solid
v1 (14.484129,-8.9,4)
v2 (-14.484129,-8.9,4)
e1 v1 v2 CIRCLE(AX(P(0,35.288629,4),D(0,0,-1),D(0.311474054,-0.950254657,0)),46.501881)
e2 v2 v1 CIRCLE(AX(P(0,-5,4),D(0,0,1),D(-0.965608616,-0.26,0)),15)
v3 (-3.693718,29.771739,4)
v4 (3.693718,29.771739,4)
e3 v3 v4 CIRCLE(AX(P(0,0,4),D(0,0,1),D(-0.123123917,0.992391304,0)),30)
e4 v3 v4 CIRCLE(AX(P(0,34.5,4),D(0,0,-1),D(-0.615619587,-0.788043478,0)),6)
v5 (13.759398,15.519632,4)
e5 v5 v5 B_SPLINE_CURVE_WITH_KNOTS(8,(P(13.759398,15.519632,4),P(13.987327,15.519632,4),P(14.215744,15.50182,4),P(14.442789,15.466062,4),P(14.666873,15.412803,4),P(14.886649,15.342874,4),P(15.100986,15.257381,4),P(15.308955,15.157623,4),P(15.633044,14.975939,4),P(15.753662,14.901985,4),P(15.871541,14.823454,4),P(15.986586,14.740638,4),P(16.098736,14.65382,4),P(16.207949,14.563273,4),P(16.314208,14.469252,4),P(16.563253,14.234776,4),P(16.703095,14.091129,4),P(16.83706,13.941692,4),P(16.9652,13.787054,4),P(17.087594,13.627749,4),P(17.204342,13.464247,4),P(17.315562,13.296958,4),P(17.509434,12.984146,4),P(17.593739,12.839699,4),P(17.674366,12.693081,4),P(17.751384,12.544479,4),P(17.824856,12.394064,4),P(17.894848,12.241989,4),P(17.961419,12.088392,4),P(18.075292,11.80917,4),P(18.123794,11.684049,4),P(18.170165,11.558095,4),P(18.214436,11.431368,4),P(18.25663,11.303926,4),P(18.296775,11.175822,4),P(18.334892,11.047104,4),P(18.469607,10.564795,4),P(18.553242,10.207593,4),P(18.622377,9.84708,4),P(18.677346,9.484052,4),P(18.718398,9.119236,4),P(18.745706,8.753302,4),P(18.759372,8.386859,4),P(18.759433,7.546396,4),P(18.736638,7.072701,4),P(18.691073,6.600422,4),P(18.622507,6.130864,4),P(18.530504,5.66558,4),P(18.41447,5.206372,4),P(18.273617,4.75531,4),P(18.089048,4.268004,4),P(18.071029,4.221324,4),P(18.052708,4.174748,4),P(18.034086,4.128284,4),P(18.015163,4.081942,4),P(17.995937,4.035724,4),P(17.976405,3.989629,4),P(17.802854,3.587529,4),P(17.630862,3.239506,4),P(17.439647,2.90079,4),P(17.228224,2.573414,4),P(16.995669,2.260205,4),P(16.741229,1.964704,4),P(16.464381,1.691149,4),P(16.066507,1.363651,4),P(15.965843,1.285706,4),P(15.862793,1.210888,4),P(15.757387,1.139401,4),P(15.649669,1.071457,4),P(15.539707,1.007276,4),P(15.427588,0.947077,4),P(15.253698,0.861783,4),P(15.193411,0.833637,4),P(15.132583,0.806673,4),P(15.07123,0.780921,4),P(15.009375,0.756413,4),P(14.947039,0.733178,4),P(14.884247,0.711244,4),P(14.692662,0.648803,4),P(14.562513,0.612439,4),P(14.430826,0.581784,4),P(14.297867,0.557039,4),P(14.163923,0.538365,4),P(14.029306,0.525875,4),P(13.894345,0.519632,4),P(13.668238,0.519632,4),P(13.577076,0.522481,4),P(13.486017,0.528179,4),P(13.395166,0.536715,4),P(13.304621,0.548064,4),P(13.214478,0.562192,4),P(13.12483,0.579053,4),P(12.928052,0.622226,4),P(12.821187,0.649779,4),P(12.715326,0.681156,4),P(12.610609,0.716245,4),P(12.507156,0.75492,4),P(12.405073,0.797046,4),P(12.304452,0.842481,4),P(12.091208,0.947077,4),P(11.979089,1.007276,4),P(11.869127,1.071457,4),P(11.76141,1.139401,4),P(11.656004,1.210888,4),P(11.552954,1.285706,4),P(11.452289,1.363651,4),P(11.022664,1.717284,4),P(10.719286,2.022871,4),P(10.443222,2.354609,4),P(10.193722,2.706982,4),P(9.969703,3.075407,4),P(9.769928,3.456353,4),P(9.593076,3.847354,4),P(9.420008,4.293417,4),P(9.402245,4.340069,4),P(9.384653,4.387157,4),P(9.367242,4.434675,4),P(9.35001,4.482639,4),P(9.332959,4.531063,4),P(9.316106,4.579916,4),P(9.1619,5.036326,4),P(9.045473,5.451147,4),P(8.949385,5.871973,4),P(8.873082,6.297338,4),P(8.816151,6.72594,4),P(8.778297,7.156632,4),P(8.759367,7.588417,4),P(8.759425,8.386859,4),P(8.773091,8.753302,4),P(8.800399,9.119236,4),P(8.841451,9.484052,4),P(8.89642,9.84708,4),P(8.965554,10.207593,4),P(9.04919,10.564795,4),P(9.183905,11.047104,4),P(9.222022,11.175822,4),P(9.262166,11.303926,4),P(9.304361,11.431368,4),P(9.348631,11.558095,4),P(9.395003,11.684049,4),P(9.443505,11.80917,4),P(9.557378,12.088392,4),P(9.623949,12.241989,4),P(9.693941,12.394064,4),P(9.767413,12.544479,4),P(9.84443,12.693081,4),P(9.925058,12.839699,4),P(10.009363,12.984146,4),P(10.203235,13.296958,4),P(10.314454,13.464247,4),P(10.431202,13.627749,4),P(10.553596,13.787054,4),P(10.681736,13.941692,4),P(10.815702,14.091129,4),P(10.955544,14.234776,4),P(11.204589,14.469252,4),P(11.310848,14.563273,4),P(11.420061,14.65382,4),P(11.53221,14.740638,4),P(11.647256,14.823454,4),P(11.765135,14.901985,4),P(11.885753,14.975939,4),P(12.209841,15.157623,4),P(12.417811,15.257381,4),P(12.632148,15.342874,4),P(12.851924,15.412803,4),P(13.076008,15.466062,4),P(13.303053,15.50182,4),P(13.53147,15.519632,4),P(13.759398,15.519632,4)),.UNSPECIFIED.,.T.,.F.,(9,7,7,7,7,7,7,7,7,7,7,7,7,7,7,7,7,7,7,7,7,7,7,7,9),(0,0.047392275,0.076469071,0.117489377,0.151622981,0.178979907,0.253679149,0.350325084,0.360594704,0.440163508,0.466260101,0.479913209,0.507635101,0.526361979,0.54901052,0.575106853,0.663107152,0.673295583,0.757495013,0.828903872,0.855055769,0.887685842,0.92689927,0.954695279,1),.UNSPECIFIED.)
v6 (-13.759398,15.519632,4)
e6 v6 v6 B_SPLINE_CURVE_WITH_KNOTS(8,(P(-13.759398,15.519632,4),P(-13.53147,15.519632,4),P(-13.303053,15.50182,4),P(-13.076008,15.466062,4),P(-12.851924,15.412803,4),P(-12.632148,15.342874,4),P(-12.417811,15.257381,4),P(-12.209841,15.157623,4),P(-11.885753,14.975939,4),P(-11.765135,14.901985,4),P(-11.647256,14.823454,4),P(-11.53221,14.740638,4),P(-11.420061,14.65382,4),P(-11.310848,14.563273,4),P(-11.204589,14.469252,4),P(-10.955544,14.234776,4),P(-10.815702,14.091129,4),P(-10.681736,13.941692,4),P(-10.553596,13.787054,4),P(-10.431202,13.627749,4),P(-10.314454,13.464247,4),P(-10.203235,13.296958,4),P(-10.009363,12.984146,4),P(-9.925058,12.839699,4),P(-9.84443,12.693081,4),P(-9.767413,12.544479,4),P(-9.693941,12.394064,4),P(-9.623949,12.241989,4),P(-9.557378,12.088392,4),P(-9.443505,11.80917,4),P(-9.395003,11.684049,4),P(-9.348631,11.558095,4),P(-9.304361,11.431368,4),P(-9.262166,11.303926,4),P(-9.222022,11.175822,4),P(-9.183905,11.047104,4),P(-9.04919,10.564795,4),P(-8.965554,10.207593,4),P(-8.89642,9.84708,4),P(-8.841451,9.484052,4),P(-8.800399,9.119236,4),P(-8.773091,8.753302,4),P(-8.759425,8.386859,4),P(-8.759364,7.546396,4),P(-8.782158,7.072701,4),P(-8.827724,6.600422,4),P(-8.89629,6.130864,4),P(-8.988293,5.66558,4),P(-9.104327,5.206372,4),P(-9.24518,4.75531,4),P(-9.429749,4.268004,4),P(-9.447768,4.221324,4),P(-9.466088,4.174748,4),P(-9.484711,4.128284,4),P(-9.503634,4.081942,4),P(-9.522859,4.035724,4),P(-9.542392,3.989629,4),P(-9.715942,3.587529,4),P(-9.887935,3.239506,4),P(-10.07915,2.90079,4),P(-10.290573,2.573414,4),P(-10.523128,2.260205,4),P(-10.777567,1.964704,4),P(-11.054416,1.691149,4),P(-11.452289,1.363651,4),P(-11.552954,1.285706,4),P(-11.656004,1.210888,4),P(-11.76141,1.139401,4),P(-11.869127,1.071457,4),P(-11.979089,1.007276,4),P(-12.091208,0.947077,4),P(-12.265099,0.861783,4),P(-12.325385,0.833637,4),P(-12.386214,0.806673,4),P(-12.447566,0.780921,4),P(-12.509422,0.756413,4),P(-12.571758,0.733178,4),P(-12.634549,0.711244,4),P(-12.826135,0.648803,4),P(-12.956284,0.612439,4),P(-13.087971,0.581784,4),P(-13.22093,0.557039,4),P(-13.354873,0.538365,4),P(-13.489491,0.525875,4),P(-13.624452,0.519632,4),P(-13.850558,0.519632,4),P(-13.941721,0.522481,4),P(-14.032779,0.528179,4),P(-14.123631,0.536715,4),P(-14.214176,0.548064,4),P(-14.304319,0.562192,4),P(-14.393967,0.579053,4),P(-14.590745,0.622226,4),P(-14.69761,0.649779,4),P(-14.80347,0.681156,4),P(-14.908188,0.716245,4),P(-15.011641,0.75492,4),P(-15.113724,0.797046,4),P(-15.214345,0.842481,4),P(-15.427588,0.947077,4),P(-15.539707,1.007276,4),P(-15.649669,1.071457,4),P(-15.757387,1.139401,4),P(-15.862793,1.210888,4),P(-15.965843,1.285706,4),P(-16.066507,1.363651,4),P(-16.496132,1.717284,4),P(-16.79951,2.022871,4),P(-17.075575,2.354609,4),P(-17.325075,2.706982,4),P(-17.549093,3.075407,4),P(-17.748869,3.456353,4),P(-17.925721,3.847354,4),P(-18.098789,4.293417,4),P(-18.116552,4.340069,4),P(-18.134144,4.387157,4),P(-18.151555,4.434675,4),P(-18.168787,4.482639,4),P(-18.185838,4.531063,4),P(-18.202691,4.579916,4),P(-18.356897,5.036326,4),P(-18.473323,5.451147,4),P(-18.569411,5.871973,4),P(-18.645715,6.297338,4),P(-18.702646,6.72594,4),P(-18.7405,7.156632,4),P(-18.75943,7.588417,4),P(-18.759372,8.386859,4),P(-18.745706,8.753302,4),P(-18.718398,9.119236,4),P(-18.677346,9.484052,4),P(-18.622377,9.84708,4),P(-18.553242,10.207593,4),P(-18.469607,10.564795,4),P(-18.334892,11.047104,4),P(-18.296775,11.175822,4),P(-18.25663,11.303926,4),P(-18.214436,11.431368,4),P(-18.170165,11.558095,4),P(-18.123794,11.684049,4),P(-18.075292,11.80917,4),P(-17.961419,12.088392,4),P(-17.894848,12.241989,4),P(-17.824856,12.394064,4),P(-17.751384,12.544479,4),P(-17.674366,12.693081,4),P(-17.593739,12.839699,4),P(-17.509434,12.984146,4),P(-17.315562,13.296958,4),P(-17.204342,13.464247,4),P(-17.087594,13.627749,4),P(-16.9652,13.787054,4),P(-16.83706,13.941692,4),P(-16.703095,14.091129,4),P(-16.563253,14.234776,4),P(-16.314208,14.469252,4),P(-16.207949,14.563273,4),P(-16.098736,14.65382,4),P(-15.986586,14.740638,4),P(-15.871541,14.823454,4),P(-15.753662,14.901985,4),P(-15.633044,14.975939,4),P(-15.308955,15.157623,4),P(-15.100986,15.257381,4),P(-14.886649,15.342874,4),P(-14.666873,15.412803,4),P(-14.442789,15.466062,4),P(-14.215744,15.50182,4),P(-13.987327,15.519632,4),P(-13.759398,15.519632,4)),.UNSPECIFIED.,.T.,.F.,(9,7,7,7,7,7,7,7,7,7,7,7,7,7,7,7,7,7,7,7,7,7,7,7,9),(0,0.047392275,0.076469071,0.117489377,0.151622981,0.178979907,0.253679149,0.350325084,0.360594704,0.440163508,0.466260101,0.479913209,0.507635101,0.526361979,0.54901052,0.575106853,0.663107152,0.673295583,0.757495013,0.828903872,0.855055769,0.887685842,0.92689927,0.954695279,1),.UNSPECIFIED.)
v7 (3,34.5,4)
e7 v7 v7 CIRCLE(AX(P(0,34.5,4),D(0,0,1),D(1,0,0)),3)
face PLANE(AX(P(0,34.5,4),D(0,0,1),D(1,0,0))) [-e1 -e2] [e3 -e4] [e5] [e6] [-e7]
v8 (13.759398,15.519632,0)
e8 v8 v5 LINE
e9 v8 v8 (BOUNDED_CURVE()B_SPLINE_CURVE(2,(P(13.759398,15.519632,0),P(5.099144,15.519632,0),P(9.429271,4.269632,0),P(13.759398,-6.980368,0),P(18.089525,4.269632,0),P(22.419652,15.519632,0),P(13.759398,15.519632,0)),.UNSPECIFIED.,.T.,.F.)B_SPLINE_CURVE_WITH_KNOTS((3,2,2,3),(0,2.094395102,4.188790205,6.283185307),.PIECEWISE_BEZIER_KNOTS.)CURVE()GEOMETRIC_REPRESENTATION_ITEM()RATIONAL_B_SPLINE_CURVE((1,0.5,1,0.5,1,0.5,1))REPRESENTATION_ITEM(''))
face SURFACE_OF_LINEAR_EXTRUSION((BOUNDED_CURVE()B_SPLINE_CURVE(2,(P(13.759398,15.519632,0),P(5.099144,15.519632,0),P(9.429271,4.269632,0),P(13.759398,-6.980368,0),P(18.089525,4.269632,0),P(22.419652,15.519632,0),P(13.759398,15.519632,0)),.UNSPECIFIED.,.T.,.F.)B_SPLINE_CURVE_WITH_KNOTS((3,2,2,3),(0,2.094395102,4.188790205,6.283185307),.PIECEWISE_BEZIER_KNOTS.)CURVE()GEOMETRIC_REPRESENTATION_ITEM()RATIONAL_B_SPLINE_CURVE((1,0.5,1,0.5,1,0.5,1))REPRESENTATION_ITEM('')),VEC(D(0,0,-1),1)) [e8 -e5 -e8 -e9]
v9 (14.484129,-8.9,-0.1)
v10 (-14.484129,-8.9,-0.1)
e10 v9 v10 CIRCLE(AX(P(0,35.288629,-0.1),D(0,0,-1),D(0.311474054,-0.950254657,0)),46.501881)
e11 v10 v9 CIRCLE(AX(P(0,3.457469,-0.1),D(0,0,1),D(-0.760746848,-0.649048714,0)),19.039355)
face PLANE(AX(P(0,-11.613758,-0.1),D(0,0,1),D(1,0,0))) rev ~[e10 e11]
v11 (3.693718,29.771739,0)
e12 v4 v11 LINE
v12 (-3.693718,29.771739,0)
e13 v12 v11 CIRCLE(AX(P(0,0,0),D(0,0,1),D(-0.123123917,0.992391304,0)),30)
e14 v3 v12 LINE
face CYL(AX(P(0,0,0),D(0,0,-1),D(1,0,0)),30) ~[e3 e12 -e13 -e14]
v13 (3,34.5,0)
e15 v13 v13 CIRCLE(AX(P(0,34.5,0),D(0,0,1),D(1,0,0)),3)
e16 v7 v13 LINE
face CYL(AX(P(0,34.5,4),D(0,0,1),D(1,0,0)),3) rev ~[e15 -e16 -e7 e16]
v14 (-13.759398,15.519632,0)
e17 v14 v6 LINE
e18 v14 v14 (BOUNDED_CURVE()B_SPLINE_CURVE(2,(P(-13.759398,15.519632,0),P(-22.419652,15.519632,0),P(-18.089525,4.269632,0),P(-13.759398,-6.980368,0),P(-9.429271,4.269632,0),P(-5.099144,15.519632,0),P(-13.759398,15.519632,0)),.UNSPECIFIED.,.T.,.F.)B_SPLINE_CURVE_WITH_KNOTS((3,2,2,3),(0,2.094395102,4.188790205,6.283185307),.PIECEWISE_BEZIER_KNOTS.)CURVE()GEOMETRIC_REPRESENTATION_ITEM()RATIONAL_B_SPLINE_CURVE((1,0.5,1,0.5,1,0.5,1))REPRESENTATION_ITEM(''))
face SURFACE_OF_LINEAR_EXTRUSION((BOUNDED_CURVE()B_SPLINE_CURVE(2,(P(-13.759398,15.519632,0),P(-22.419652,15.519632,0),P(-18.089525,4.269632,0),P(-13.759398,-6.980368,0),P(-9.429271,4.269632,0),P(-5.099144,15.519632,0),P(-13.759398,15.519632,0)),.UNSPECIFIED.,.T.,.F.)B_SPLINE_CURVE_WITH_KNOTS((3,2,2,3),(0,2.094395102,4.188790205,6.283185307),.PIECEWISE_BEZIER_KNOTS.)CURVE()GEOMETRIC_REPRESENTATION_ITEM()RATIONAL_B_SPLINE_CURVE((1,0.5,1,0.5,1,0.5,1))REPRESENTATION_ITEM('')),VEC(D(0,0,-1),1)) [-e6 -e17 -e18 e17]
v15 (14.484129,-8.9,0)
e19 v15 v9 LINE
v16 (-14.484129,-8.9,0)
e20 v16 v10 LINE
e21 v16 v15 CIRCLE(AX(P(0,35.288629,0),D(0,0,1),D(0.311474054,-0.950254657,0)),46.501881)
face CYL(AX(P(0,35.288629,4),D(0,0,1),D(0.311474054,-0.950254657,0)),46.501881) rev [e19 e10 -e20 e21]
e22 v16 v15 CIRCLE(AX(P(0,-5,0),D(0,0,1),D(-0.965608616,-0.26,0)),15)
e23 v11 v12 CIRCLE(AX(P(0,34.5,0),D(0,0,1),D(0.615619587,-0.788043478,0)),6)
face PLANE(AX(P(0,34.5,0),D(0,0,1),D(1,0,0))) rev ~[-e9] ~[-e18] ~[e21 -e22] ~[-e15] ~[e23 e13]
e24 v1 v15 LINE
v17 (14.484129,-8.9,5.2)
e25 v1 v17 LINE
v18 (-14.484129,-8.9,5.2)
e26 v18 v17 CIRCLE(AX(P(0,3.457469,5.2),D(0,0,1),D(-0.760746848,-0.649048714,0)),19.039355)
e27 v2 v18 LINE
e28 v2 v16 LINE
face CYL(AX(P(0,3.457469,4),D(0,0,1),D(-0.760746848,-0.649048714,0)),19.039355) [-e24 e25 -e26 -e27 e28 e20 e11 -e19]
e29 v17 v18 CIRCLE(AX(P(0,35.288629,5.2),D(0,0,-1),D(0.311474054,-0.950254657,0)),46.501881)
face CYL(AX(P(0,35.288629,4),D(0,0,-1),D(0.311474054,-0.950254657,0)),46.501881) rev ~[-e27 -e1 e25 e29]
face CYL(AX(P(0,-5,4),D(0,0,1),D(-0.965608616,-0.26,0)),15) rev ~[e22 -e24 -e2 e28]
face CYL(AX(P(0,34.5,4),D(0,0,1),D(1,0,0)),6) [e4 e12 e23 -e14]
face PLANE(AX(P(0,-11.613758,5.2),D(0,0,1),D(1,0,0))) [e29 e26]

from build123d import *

# Parameters (mm, degrees)
F0_R          = 30
F1_DEPTH      = 4
F3_DEPTH      = 15.7
F5_DEPTH      = 14.1
F7_DEPTH      = 1.2
F7_DEPTH_BACK = 4.1
F8_R          = 6
F8_R_2        = 3
F9_DEPTH      = 4


# Not quite as in the source:
# - a feature names something its author has since deleted; it is built from what else it names


with BuildPart() as f1:
    # F0 (on Top) → F1 (new body)
    with BuildSketch(Plane.XY):
        Circle(F0_R)
        with BuildLine():
            ThreePointArc((18.5144313724, -15.5611746563), (-0.2600227829, -23.7984225598), (-18.8815741249, -15.2211148546))
            Line((-18.8815741249, -15.2211148546), (-16.6486222239, -13.9582220563))
            Line((-16.6486222239, -13.9582220563), (-14.4156703229, -12.695329258))
            ThreePointArc((-14.4156703229, -12.695329258), (-0.3525836389, -18.7968976895), (13.8984762541, -13.1482840248))
            Line((13.8984762541, -13.1482840248), (16.2064538132, -14.3547293405))
            Line((16.2064538132, -14.3547293405), (18.5144313724, -15.5611746563))
        make_face(mode=Mode.SUBTRACT)
        with BuildLine():
            add(Edge.make_bspline(
                [(-13.759398363, 15.5196315202), (-22.4196524008, 15.5196315202), (-18.0895253819, 4.2696315202), (-13.759398363, -6.9803684798), (-9.4292713441, 4.2696315202), (-5.0991443251, 15.5196315202), (-13.759398363, 15.5196315202)],
                knots=[0, 0, 0, 2.0943951024, 2.0943951024, 4.1887902048, 4.1887902048, 6.2831853072, 6.2831853072, 6.2831853072], degree=2, weights=[1, 0.5, 1, 0.5, 1, 0.5, 1]))
        make_face(mode=Mode.SUBTRACT)
        with BuildLine():
            add(Edge.make_bspline(
                [(13.759398363, 15.5196315202), (5.0991443251, 15.5196315202), (9.4292713441, 4.2696315202), (13.759398363, -6.9803684798), (18.0895253819, 4.2696315202), (22.4196524008, 15.5196315202), (13.759398363, 15.5196315202)],
                knots=[0, 0, 0, 2.0943951024, 2.0943951024, 4.1887902048, 4.1887902048, 6.2831853072, 6.2831853072, 6.2831853072], degree=2, weights=[1, 0.5, 1, 0.5, 1, 0.5, 1]))
        make_face(mode=Mode.SUBTRACT)
        with BuildLine():
            add(Edge.make_bspline(
                [(13.759398363, 15.5196315202), (5.0991443251, 15.5196315202), (9.4292713441, 4.2696315202), (13.759398363, -6.9803684798), (18.0895253819, 4.2696315202), (22.4196524008, 15.5196315202), (13.759398363, 15.5196315202)],
                knots=[0, 0, 0, 2.0943951024, 2.0943951024, 4.1887902048, 4.1887902048, 6.2831853072, 6.2831853072, 6.2831853072], degree=2, weights=[1, 0.5, 1, 0.5, 1, 0.5, 1]))
        make_face()
        with BuildLine():
            add(Edge.make_bspline(
                [(-13.759398363, 15.5196315202), (-22.4196524008, 15.5196315202), (-18.0895253819, 4.2696315202), (-13.759398363, -6.9803684798), (-9.4292713441, 4.2696315202), (-5.0991443251, 15.5196315202), (-13.759398363, 15.5196315202)],
                knots=[0, 0, 0, 2.0943951024, 2.0943951024, 4.1887902048, 4.1887902048, 6.2831853072, 6.2831853072, 6.2831853072], degree=2, weights=[1, 0.5, 1, 0.5, 1, 0.5, 1]))
        make_face()
        with BuildLine():
            Line((-14.4156703229, -12.695329258), (-16.6486222239, -13.9582220563))
            ThreePointArc((-16.6486222239, -13.9582220563), (-0.3057099111, -21.168664653), (16.2064538132, -14.3547293405))
            Line((16.2064538132, -14.3547293405), (13.8984762541, -13.1482840248))
            ThreePointArc((13.8984762541, -13.1482840248), (-0.3525836389, -18.7968976895), (-14.4156703229, -12.695329258))
        make_face()
        with BuildLine():
            Line((-16.6486222239, -13.9582220563), (-18.8815741249, -15.2211148546))
            ThreePointArc((-18.8815741249, -15.2211148546), (-0.2600227829, -23.7984225598), (18.5144313724, -15.5611746563))
            Line((18.5144313724, -15.5611746563), (16.2064538132, -14.3547293405))
            ThreePointArc((16.2064538132, -14.3547293405), (-0.3057099111, -21.168664653), (-16.6486222239, -13.9582220563))
        make_face()
    extrude(amount=F1_DEPTH)

    # F2 (on face) → F3 (cut)
    with BuildSketch(Plane.XY.offset(4)):
        with BuildLine():
            ThreePointArc((14.4841292455, -8.9), (0, -11.2132519808), (-14.4841292455, -8.9))
            ThreePointArc((-14.4841292455, -8.9), (0, -20), (14.4841292455, -8.9))
        make_face()
    extrude(amount=-F3_DEPTH, mode=Mode.SUBTRACT)

    # F0 (on Top) → F5 (cut)
    with BuildSketch(Plane.XY):
        with BuildLine():
            add(Edge.make_bspline(
                [(-13.759398363, 15.5196315202), (-22.4196524008, 15.5196315202), (-18.0895253819, 4.2696315202), (-13.759398363, -6.9803684798), (-9.4292713441, 4.2696315202), (-5.0991443251, 15.5196315202), (-13.759398363, 15.5196315202)],
                knots=[0, 0, 0, 2.0943951024, 2.0943951024, 4.1887902048, 4.1887902048, 6.2831853072, 6.2831853072, 6.2831853072], degree=2, weights=[1, 0.5, 1, 0.5, 1, 0.5, 1]))
        make_face()
        with BuildLine():
            add(Edge.make_bspline(
                [(13.759398363, 15.5196315202), (5.0991443251, 15.5196315202), (9.4292713441, 4.2696315202), (13.759398363, -6.9803684798), (18.0895253819, 4.2696315202), (22.4196524008, 15.5196315202), (13.759398363, 15.5196315202)],
                knots=[0, 0, 0, 2.0943951024, 2.0943951024, 4.1887902048, 4.1887902048, 6.2831853072, 6.2831853072, 6.2831853072], degree=2, weights=[1, 0.5, 1, 0.5, 1, 0.5, 1]))
        make_face()
    extrude(amount=F5_DEPTH, mode=Mode.SUBTRACT)

    # F6 (on face) → F7 (join, two sides)
    with BuildSketch(Plane.XY.offset(4)) as f7_sk:
        with BuildLine():
            ThreePointArc((14.4841292455, -8.9), (0, -11.2132519808), (-14.4841292455, -8.9))
            ThreePointArc((-14.4841292455, -8.9), (0, -15.581886089), (14.4841292455, -8.9))
        make_face()
    extrude(amount=F7_DEPTH)
    extrude(f7_sk.sketch, amount=-F7_DEPTH_BACK)

    # F8 (on face) → F9 (join)
    with BuildSketch(Plane.XY.offset(4)):
        with Locations((0, 34.5)):
            Circle(F8_R)
        with Locations((0, 34.5)):
            Circle(F8_R_2, mode=Mode.SUBTRACT)
    extrude(amount=-F9_DEPTH)


solid = f1.part
